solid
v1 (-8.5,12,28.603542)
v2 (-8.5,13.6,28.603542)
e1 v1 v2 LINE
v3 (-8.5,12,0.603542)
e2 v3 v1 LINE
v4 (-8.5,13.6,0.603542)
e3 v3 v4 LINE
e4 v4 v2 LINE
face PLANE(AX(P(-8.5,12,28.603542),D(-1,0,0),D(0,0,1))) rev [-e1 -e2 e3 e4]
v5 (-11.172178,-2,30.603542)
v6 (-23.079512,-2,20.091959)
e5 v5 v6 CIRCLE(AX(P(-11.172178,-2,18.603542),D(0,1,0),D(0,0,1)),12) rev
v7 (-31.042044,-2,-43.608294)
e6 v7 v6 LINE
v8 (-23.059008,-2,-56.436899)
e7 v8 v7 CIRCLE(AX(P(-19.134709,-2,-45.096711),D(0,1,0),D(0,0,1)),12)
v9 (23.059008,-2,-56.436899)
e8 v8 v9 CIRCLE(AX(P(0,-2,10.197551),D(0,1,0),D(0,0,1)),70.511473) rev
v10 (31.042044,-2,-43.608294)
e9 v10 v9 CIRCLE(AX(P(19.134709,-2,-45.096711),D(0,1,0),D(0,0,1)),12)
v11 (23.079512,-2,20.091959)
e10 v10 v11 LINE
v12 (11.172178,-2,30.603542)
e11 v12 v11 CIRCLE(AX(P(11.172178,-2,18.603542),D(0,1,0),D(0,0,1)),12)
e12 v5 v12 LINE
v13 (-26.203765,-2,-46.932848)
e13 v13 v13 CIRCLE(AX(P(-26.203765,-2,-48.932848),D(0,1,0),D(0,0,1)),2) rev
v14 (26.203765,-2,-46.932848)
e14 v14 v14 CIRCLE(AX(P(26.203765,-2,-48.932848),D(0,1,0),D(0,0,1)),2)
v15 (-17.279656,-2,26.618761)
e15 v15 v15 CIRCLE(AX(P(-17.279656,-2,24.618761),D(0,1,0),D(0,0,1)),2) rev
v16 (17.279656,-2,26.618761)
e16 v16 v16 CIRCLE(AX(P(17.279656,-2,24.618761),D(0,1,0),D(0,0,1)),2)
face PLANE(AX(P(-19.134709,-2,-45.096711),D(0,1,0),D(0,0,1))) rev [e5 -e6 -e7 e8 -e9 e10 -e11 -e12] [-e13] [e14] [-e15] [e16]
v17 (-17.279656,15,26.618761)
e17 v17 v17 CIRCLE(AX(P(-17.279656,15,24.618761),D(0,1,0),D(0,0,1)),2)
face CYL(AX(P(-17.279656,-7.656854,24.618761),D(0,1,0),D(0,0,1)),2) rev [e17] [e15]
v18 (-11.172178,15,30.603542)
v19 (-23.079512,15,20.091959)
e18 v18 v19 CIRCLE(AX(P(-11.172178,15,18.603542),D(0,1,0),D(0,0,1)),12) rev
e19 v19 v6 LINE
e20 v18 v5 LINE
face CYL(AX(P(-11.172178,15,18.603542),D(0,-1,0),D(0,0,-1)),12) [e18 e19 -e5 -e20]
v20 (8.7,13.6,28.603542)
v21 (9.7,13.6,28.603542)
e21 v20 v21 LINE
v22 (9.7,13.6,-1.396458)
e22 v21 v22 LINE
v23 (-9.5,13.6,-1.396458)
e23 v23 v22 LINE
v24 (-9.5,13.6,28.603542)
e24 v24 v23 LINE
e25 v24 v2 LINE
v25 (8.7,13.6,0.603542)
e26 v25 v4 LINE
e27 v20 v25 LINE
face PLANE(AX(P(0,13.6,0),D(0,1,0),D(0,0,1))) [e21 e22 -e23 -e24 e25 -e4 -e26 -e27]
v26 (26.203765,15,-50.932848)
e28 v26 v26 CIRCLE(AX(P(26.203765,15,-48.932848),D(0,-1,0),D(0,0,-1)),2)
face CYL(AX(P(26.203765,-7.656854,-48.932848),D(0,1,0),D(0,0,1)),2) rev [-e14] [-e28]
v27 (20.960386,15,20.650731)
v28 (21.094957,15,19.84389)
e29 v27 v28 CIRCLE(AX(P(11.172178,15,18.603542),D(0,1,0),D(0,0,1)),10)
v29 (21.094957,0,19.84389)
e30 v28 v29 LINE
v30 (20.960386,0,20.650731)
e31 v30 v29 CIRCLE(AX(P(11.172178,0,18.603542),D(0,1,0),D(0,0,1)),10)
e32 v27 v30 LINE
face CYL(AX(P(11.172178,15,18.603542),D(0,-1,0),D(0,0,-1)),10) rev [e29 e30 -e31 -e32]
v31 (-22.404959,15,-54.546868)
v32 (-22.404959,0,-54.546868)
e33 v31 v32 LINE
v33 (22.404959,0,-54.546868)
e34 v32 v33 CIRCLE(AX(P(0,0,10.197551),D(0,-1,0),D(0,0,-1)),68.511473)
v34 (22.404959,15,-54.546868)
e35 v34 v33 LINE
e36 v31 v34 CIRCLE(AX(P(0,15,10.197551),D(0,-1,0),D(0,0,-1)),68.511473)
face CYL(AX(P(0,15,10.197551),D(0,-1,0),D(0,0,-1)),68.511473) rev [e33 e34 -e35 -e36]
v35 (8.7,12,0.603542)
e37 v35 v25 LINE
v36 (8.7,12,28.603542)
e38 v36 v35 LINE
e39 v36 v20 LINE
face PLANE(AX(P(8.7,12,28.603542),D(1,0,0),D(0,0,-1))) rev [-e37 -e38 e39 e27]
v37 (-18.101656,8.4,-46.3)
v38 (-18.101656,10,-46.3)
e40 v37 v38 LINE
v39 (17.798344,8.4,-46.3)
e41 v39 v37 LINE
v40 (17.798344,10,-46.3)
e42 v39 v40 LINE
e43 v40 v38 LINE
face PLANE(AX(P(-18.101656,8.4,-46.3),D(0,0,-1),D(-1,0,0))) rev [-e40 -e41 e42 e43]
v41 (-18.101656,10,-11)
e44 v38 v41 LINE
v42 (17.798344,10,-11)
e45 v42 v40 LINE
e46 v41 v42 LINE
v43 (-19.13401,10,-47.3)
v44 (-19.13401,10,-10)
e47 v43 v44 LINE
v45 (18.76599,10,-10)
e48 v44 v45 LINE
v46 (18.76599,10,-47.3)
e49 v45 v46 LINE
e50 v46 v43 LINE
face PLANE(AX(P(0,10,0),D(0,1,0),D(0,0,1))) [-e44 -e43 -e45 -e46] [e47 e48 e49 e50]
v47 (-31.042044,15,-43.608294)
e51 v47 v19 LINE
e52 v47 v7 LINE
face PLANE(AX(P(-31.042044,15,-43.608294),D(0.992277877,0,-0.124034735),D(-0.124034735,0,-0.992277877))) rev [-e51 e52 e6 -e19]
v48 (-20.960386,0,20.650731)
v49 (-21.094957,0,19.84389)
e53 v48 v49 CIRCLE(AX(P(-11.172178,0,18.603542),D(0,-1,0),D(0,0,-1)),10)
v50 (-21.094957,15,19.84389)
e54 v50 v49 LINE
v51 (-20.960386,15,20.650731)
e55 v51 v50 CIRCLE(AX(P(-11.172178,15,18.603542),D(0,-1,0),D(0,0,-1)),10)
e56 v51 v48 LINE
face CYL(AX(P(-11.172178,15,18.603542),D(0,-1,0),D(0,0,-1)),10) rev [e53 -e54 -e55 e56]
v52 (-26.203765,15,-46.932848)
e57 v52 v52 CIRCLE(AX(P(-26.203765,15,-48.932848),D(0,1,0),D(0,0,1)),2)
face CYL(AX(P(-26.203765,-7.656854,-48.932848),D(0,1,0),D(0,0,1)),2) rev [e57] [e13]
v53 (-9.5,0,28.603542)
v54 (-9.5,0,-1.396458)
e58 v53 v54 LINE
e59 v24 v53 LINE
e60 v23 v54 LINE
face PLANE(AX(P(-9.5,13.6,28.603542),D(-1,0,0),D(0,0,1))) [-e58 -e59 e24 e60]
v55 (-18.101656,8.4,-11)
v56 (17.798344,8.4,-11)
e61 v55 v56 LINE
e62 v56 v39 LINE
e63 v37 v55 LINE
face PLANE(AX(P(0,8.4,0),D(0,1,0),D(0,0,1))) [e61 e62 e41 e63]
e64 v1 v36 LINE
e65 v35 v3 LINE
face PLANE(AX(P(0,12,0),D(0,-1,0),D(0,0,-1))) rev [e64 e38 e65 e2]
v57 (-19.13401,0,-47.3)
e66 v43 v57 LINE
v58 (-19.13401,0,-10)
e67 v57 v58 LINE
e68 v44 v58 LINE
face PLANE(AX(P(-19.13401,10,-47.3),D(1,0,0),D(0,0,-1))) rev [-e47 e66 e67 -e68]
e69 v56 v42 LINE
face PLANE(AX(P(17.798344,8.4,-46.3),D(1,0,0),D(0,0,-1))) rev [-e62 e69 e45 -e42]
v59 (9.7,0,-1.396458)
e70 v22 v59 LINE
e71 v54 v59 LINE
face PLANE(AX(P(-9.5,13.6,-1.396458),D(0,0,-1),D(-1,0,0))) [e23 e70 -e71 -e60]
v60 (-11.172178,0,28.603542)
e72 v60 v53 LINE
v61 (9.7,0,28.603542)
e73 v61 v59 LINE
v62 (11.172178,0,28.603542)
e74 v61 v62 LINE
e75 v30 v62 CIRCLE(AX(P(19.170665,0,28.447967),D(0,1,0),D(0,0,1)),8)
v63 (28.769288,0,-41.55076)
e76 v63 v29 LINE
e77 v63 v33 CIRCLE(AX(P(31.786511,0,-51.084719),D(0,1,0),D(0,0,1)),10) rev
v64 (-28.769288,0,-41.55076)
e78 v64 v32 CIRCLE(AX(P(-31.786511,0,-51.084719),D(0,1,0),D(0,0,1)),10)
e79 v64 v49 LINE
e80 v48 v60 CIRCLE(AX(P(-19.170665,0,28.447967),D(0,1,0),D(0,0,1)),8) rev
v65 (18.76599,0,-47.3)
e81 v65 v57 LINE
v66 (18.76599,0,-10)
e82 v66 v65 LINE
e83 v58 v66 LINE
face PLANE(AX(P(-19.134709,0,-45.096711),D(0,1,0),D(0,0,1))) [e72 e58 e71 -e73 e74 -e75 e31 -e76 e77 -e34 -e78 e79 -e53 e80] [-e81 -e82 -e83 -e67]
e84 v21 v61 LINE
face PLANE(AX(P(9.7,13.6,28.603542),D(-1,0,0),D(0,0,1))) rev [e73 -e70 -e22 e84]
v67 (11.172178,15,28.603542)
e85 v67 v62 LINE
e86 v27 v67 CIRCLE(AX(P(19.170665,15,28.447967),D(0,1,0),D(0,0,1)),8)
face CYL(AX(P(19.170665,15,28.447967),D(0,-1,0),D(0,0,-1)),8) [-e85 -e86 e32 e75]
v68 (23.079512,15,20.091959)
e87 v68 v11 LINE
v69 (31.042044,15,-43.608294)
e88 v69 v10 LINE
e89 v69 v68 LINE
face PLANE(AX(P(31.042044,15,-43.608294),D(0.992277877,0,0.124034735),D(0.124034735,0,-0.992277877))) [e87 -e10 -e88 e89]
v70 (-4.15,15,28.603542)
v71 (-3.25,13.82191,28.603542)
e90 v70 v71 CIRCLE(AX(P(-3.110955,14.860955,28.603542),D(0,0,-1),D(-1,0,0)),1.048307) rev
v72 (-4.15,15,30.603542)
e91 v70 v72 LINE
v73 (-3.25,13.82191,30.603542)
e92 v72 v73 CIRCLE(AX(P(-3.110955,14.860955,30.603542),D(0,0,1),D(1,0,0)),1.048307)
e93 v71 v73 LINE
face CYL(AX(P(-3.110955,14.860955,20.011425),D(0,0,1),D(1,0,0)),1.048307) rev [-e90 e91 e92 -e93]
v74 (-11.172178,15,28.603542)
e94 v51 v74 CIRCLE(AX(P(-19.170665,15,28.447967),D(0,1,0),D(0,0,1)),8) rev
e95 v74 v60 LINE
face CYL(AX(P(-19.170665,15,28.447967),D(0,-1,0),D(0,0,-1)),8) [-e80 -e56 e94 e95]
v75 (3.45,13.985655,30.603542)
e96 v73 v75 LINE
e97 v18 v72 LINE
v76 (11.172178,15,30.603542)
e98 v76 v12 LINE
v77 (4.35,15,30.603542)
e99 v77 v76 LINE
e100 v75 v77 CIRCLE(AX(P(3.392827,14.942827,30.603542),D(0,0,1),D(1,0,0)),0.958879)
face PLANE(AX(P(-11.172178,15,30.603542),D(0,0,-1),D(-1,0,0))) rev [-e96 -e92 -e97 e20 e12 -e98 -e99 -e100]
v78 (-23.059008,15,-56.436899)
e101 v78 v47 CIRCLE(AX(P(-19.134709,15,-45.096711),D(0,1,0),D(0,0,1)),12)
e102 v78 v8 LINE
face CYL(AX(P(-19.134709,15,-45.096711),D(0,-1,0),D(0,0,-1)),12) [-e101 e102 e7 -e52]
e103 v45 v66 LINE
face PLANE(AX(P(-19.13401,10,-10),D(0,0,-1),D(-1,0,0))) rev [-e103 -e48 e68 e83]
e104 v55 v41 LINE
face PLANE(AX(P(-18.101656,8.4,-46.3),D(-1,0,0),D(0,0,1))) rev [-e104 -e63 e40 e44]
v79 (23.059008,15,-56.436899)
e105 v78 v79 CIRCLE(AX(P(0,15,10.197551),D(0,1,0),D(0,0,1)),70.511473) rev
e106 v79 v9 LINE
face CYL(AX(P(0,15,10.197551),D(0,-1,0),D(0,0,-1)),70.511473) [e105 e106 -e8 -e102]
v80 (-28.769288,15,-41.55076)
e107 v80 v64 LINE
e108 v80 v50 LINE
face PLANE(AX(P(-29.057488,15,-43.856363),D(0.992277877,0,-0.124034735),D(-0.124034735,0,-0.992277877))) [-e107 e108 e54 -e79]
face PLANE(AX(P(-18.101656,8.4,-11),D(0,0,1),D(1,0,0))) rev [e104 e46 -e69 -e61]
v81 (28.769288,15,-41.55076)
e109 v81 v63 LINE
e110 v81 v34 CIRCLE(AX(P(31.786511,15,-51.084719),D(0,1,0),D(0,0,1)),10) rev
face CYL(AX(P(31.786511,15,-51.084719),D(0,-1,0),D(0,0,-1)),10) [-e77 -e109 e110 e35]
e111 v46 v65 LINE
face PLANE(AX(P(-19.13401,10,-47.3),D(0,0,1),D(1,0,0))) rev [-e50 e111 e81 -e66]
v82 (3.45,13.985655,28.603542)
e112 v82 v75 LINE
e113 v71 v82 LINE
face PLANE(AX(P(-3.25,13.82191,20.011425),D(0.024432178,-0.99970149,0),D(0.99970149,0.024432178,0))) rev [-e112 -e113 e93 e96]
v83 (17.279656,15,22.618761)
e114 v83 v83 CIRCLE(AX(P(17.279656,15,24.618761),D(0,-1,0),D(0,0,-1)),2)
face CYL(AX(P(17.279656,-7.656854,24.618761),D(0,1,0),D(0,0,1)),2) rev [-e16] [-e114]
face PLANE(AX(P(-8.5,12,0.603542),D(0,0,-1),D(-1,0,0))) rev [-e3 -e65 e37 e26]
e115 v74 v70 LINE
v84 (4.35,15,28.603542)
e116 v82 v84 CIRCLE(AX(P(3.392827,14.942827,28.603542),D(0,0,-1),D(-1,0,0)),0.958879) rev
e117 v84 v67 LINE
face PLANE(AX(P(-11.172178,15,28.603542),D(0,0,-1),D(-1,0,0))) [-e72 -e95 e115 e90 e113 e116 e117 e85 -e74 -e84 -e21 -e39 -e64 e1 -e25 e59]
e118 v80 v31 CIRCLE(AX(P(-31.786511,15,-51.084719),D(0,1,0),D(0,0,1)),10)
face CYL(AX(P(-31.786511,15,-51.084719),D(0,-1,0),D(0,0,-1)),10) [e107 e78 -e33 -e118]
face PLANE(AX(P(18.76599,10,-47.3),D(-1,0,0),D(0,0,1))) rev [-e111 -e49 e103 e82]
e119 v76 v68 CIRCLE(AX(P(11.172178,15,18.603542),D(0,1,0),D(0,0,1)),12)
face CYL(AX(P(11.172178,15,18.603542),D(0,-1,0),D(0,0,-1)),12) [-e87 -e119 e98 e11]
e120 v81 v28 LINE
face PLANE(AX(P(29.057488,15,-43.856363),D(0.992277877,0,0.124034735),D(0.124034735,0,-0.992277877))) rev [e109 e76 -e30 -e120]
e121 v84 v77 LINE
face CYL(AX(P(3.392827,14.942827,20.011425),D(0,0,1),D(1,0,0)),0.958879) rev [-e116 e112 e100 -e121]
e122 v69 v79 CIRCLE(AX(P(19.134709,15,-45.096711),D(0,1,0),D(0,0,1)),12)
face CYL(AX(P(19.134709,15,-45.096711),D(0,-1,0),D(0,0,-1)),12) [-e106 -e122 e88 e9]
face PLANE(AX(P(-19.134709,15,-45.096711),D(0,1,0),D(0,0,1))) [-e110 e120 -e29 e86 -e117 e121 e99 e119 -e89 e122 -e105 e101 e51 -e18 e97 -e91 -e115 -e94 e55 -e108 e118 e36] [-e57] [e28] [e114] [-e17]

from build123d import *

# Parameters (mm, degrees)
BOSS_EXTRUDE1_DEPTH = 15
SHELL1_T            = 2
BOSS_EXTRUDE2_DEPTH = 15
SKETCH4_R           = 2
CUT_EXTRUDE3_DEPTH  = 17
SKETCH5_W           = 37.9
SKETCH5_H           = 37.3
BOSS_EXTRUDE3_DEPTH = 10
SKETCH8_W           = 35.9
SKETCH8_H           = 35.3
CUT_EXTRUDE4_DEPTH  = 1.6
SKETCH9_W           = 19.2
SKETCH9_H           = 30
BOSS_EXTRUDE5_DEPTH = 13.6
SKETCH11_W          = 17.2
SKETCH11_H          = 28
CUT_EXTRUDE7_DEPTH  = 1.6
CUT_EXTRUDE8_DEPTH  = 2


# Read off the part's stored shape, not the designer's step: Boss-Extrude2
with BuildPart() as part:
    # Sketch2 → Boss-Extrude1 (new body)
    with BuildSketch(Plane(origin=(0, 0, 0), x_dir=(1, 0, 0), z_dir=(0, 1, 0))):
        with BuildLine():
            Line((-29.057488174, 43.856363161), (-21.094956582, -19.84388958))
            ThreePointArc((-21.094956582, -19.84388958), (-17.790203447, -26.100323992), (-11.172177815, -28.603542234))
            Line((-11.172177815, -28.603542234), (11.172177815, -28.603542234))
            ThreePointArc((11.172177815, -28.603542234), (17.790203447, -26.100323992), (21.094956582, -19.84388958))
            Line((21.094956582, -19.84388958), (29.057488174, 43.856363161))
            ThreePointArc((29.057488174, 43.856363161), (27.625040268, 50.380107319), (22.404958564, 54.546867672))
            ThreePointArc((22.404958564, 54.546867672), (0, 58.313921904), (-22.404958564, 54.546867672))
            ThreePointArc((-22.404958564, 54.546867672), (-27.625040268, 50.380107319), (-29.057488174, 43.856363161))
        make_face()
    extrude(amount=BOSS_EXTRUDE1_DEPTH)

    # Shell1
    shell1_openings = [part.faces().sort_by_distance(p)[0] for p in [
        (0, 15, -16.825507136),
    ]]
    offset(amount=SHELL1_T, openings=shell1_openings, kind=Kind.INTERSECTION)

    # Boss-Extrude2 outline → Boss-Extrude2 (add)
    with BuildSketch(Plane(origin=(0, 0, 0), x_dir=(1, 0, 0), z_dir=(0, 1, 0))):
        with BuildLine():
            ThreePointArc((11.172177815, -28.603542234), (17.478052637, -26.364724021), (20.960385979, -20.65073078))
            ThreePointArc((20.960385979, -20.65073078), (14.125965093, -22.239021953), (11.172177815, -28.603542234))
        make_face()
        with BuildLine():
            ThreePointArc((22.404958564, 54.546867672), (22.805580573, 46.686663567), (28.769287815, 41.550760286))
            Line((28.769287815, 41.550760286), (29.057488174, 43.856363161))
            ThreePointArc((29.057488174, 43.856363161), (27.625040268, 50.380107319), (22.404958564, 54.546867672))
        make_face()
        with BuildLine():
            ThreePointArc((-11.172177815, -28.603542234), (-14.125965093, -22.239021953), (-20.960385978, -20.65073078))
            ThreePointArc((-20.960385978, -20.65073078), (-17.478052637, -26.364724021), (-11.172177815, -28.603542234))
        make_face()
        with BuildLine():
            Line((-29.057488174, 43.856363161), (-28.769287815, 41.550760286))
            ThreePointArc((-28.769287815, 41.550760286), (-22.805580573, 46.686663567), (-22.404958564, 54.546867672))
            ThreePointArc((-22.404958564, 54.546867672), (-27.625040268, 50.380107319), (-29.057488174, 43.856363161))
        make_face()
    extrude(amount=BOSS_EXTRUDE2_DEPTH)

    # Sketch4 → Cut-Extrude3 (cut)
    with BuildSketch(Plane(origin=(0, 15, 0), x_dir=(1, 0, 0), z_dir=(0, 1, 0))):
        with Locations(Location((-26.203765036, 48.932847943, 0), (0, 0, 270))):
            Circle(SKETCH4_R)
        with Locations(Location((-17.279655559, -24.618760567, 0), (0, 0, 270))):
            Circle(SKETCH4_R)
        with Locations(Location((17.279655559, -24.618760567, 0), (0, 0, 270))):
            Circle(SKETCH4_R)
        with Locations(Location((26.203765036, 48.932847943, 0), (0, 0, 270))):
            Circle(SKETCH4_R)
    extrude(amount=-CUT_EXTRUDE3_DEPTH, mode=Mode.SUBTRACT)

    # Sketch5 → Boss-Extrude3 (add)
    with BuildSketch(Plane(origin=(-2.134010057, 0, 0), x_dir=(1, 0, 0), z_dir=(0, 1, 0))):
        with Locations((1.95, 28.65)):
            Rectangle(SKETCH5_W, SKETCH5_H)
    extrude(amount=BOSS_EXTRUDE3_DEPTH)

    # Sketch8 → Cut-Extrude4 (cut)
    with BuildSketch(Plane(origin=(48.898344446, 10, 0), x_dir=(1, 0, 0), z_dir=(0, 1, 0))):
        with Locations((-49.05, 28.65)):
            Rectangle(SKETCH8_W, SKETCH8_H)
    extrude(amount=-CUT_EXTRUDE4_DEPTH, mode=Mode.SUBTRACT)

    # Sketch9 → Boss-Extrude5 (add)
    with BuildSketch(Plane(origin=(0, 0, 0), x_dir=(1, 0, 0), z_dir=(0, 1, 0))):
        with Locations((0.1, -13.603542234)):
            Rectangle(SKETCH9_W, SKETCH9_H)
    extrude(amount=BOSS_EXTRUDE5_DEPTH)

    # Sketch11 → Cut-Extrude7 (cut)
    with BuildSketch(Plane(origin=(0, 13.6, 0), x_dir=(1, 0, 0), z_dir=(0, 1, 0))):
        with Locations((0.1, -14.603542234)):
            Rectangle(SKETCH11_W, SKETCH11_H)
    extrude(amount=-CUT_EXTRUDE7_DEPTH, mode=Mode.SUBTRACT)

    # Sketch12 → Cut-Extrude8 (cut)
    with BuildSketch(Plane.XY.offset(30.603542234)):
        with BuildLine():
            Line((-4.15, 15), (4.35, 15))
            ThreePointArc((4.35, 15), (4.110077828, 14.306431155), (3.45, 13.985654515))
            Line((3.45, 13.985654515), (-3.25, 13.821910042))
            ThreePointArc((-3.25, 13.821910042), (-3.943990419, 14.224558918), (-4.15, 15))
        make_face()
    extrude(amount=-CUT_EXTRUDE8_DEPTH, mode=Mode.SUBTRACT)


solid = part.part
